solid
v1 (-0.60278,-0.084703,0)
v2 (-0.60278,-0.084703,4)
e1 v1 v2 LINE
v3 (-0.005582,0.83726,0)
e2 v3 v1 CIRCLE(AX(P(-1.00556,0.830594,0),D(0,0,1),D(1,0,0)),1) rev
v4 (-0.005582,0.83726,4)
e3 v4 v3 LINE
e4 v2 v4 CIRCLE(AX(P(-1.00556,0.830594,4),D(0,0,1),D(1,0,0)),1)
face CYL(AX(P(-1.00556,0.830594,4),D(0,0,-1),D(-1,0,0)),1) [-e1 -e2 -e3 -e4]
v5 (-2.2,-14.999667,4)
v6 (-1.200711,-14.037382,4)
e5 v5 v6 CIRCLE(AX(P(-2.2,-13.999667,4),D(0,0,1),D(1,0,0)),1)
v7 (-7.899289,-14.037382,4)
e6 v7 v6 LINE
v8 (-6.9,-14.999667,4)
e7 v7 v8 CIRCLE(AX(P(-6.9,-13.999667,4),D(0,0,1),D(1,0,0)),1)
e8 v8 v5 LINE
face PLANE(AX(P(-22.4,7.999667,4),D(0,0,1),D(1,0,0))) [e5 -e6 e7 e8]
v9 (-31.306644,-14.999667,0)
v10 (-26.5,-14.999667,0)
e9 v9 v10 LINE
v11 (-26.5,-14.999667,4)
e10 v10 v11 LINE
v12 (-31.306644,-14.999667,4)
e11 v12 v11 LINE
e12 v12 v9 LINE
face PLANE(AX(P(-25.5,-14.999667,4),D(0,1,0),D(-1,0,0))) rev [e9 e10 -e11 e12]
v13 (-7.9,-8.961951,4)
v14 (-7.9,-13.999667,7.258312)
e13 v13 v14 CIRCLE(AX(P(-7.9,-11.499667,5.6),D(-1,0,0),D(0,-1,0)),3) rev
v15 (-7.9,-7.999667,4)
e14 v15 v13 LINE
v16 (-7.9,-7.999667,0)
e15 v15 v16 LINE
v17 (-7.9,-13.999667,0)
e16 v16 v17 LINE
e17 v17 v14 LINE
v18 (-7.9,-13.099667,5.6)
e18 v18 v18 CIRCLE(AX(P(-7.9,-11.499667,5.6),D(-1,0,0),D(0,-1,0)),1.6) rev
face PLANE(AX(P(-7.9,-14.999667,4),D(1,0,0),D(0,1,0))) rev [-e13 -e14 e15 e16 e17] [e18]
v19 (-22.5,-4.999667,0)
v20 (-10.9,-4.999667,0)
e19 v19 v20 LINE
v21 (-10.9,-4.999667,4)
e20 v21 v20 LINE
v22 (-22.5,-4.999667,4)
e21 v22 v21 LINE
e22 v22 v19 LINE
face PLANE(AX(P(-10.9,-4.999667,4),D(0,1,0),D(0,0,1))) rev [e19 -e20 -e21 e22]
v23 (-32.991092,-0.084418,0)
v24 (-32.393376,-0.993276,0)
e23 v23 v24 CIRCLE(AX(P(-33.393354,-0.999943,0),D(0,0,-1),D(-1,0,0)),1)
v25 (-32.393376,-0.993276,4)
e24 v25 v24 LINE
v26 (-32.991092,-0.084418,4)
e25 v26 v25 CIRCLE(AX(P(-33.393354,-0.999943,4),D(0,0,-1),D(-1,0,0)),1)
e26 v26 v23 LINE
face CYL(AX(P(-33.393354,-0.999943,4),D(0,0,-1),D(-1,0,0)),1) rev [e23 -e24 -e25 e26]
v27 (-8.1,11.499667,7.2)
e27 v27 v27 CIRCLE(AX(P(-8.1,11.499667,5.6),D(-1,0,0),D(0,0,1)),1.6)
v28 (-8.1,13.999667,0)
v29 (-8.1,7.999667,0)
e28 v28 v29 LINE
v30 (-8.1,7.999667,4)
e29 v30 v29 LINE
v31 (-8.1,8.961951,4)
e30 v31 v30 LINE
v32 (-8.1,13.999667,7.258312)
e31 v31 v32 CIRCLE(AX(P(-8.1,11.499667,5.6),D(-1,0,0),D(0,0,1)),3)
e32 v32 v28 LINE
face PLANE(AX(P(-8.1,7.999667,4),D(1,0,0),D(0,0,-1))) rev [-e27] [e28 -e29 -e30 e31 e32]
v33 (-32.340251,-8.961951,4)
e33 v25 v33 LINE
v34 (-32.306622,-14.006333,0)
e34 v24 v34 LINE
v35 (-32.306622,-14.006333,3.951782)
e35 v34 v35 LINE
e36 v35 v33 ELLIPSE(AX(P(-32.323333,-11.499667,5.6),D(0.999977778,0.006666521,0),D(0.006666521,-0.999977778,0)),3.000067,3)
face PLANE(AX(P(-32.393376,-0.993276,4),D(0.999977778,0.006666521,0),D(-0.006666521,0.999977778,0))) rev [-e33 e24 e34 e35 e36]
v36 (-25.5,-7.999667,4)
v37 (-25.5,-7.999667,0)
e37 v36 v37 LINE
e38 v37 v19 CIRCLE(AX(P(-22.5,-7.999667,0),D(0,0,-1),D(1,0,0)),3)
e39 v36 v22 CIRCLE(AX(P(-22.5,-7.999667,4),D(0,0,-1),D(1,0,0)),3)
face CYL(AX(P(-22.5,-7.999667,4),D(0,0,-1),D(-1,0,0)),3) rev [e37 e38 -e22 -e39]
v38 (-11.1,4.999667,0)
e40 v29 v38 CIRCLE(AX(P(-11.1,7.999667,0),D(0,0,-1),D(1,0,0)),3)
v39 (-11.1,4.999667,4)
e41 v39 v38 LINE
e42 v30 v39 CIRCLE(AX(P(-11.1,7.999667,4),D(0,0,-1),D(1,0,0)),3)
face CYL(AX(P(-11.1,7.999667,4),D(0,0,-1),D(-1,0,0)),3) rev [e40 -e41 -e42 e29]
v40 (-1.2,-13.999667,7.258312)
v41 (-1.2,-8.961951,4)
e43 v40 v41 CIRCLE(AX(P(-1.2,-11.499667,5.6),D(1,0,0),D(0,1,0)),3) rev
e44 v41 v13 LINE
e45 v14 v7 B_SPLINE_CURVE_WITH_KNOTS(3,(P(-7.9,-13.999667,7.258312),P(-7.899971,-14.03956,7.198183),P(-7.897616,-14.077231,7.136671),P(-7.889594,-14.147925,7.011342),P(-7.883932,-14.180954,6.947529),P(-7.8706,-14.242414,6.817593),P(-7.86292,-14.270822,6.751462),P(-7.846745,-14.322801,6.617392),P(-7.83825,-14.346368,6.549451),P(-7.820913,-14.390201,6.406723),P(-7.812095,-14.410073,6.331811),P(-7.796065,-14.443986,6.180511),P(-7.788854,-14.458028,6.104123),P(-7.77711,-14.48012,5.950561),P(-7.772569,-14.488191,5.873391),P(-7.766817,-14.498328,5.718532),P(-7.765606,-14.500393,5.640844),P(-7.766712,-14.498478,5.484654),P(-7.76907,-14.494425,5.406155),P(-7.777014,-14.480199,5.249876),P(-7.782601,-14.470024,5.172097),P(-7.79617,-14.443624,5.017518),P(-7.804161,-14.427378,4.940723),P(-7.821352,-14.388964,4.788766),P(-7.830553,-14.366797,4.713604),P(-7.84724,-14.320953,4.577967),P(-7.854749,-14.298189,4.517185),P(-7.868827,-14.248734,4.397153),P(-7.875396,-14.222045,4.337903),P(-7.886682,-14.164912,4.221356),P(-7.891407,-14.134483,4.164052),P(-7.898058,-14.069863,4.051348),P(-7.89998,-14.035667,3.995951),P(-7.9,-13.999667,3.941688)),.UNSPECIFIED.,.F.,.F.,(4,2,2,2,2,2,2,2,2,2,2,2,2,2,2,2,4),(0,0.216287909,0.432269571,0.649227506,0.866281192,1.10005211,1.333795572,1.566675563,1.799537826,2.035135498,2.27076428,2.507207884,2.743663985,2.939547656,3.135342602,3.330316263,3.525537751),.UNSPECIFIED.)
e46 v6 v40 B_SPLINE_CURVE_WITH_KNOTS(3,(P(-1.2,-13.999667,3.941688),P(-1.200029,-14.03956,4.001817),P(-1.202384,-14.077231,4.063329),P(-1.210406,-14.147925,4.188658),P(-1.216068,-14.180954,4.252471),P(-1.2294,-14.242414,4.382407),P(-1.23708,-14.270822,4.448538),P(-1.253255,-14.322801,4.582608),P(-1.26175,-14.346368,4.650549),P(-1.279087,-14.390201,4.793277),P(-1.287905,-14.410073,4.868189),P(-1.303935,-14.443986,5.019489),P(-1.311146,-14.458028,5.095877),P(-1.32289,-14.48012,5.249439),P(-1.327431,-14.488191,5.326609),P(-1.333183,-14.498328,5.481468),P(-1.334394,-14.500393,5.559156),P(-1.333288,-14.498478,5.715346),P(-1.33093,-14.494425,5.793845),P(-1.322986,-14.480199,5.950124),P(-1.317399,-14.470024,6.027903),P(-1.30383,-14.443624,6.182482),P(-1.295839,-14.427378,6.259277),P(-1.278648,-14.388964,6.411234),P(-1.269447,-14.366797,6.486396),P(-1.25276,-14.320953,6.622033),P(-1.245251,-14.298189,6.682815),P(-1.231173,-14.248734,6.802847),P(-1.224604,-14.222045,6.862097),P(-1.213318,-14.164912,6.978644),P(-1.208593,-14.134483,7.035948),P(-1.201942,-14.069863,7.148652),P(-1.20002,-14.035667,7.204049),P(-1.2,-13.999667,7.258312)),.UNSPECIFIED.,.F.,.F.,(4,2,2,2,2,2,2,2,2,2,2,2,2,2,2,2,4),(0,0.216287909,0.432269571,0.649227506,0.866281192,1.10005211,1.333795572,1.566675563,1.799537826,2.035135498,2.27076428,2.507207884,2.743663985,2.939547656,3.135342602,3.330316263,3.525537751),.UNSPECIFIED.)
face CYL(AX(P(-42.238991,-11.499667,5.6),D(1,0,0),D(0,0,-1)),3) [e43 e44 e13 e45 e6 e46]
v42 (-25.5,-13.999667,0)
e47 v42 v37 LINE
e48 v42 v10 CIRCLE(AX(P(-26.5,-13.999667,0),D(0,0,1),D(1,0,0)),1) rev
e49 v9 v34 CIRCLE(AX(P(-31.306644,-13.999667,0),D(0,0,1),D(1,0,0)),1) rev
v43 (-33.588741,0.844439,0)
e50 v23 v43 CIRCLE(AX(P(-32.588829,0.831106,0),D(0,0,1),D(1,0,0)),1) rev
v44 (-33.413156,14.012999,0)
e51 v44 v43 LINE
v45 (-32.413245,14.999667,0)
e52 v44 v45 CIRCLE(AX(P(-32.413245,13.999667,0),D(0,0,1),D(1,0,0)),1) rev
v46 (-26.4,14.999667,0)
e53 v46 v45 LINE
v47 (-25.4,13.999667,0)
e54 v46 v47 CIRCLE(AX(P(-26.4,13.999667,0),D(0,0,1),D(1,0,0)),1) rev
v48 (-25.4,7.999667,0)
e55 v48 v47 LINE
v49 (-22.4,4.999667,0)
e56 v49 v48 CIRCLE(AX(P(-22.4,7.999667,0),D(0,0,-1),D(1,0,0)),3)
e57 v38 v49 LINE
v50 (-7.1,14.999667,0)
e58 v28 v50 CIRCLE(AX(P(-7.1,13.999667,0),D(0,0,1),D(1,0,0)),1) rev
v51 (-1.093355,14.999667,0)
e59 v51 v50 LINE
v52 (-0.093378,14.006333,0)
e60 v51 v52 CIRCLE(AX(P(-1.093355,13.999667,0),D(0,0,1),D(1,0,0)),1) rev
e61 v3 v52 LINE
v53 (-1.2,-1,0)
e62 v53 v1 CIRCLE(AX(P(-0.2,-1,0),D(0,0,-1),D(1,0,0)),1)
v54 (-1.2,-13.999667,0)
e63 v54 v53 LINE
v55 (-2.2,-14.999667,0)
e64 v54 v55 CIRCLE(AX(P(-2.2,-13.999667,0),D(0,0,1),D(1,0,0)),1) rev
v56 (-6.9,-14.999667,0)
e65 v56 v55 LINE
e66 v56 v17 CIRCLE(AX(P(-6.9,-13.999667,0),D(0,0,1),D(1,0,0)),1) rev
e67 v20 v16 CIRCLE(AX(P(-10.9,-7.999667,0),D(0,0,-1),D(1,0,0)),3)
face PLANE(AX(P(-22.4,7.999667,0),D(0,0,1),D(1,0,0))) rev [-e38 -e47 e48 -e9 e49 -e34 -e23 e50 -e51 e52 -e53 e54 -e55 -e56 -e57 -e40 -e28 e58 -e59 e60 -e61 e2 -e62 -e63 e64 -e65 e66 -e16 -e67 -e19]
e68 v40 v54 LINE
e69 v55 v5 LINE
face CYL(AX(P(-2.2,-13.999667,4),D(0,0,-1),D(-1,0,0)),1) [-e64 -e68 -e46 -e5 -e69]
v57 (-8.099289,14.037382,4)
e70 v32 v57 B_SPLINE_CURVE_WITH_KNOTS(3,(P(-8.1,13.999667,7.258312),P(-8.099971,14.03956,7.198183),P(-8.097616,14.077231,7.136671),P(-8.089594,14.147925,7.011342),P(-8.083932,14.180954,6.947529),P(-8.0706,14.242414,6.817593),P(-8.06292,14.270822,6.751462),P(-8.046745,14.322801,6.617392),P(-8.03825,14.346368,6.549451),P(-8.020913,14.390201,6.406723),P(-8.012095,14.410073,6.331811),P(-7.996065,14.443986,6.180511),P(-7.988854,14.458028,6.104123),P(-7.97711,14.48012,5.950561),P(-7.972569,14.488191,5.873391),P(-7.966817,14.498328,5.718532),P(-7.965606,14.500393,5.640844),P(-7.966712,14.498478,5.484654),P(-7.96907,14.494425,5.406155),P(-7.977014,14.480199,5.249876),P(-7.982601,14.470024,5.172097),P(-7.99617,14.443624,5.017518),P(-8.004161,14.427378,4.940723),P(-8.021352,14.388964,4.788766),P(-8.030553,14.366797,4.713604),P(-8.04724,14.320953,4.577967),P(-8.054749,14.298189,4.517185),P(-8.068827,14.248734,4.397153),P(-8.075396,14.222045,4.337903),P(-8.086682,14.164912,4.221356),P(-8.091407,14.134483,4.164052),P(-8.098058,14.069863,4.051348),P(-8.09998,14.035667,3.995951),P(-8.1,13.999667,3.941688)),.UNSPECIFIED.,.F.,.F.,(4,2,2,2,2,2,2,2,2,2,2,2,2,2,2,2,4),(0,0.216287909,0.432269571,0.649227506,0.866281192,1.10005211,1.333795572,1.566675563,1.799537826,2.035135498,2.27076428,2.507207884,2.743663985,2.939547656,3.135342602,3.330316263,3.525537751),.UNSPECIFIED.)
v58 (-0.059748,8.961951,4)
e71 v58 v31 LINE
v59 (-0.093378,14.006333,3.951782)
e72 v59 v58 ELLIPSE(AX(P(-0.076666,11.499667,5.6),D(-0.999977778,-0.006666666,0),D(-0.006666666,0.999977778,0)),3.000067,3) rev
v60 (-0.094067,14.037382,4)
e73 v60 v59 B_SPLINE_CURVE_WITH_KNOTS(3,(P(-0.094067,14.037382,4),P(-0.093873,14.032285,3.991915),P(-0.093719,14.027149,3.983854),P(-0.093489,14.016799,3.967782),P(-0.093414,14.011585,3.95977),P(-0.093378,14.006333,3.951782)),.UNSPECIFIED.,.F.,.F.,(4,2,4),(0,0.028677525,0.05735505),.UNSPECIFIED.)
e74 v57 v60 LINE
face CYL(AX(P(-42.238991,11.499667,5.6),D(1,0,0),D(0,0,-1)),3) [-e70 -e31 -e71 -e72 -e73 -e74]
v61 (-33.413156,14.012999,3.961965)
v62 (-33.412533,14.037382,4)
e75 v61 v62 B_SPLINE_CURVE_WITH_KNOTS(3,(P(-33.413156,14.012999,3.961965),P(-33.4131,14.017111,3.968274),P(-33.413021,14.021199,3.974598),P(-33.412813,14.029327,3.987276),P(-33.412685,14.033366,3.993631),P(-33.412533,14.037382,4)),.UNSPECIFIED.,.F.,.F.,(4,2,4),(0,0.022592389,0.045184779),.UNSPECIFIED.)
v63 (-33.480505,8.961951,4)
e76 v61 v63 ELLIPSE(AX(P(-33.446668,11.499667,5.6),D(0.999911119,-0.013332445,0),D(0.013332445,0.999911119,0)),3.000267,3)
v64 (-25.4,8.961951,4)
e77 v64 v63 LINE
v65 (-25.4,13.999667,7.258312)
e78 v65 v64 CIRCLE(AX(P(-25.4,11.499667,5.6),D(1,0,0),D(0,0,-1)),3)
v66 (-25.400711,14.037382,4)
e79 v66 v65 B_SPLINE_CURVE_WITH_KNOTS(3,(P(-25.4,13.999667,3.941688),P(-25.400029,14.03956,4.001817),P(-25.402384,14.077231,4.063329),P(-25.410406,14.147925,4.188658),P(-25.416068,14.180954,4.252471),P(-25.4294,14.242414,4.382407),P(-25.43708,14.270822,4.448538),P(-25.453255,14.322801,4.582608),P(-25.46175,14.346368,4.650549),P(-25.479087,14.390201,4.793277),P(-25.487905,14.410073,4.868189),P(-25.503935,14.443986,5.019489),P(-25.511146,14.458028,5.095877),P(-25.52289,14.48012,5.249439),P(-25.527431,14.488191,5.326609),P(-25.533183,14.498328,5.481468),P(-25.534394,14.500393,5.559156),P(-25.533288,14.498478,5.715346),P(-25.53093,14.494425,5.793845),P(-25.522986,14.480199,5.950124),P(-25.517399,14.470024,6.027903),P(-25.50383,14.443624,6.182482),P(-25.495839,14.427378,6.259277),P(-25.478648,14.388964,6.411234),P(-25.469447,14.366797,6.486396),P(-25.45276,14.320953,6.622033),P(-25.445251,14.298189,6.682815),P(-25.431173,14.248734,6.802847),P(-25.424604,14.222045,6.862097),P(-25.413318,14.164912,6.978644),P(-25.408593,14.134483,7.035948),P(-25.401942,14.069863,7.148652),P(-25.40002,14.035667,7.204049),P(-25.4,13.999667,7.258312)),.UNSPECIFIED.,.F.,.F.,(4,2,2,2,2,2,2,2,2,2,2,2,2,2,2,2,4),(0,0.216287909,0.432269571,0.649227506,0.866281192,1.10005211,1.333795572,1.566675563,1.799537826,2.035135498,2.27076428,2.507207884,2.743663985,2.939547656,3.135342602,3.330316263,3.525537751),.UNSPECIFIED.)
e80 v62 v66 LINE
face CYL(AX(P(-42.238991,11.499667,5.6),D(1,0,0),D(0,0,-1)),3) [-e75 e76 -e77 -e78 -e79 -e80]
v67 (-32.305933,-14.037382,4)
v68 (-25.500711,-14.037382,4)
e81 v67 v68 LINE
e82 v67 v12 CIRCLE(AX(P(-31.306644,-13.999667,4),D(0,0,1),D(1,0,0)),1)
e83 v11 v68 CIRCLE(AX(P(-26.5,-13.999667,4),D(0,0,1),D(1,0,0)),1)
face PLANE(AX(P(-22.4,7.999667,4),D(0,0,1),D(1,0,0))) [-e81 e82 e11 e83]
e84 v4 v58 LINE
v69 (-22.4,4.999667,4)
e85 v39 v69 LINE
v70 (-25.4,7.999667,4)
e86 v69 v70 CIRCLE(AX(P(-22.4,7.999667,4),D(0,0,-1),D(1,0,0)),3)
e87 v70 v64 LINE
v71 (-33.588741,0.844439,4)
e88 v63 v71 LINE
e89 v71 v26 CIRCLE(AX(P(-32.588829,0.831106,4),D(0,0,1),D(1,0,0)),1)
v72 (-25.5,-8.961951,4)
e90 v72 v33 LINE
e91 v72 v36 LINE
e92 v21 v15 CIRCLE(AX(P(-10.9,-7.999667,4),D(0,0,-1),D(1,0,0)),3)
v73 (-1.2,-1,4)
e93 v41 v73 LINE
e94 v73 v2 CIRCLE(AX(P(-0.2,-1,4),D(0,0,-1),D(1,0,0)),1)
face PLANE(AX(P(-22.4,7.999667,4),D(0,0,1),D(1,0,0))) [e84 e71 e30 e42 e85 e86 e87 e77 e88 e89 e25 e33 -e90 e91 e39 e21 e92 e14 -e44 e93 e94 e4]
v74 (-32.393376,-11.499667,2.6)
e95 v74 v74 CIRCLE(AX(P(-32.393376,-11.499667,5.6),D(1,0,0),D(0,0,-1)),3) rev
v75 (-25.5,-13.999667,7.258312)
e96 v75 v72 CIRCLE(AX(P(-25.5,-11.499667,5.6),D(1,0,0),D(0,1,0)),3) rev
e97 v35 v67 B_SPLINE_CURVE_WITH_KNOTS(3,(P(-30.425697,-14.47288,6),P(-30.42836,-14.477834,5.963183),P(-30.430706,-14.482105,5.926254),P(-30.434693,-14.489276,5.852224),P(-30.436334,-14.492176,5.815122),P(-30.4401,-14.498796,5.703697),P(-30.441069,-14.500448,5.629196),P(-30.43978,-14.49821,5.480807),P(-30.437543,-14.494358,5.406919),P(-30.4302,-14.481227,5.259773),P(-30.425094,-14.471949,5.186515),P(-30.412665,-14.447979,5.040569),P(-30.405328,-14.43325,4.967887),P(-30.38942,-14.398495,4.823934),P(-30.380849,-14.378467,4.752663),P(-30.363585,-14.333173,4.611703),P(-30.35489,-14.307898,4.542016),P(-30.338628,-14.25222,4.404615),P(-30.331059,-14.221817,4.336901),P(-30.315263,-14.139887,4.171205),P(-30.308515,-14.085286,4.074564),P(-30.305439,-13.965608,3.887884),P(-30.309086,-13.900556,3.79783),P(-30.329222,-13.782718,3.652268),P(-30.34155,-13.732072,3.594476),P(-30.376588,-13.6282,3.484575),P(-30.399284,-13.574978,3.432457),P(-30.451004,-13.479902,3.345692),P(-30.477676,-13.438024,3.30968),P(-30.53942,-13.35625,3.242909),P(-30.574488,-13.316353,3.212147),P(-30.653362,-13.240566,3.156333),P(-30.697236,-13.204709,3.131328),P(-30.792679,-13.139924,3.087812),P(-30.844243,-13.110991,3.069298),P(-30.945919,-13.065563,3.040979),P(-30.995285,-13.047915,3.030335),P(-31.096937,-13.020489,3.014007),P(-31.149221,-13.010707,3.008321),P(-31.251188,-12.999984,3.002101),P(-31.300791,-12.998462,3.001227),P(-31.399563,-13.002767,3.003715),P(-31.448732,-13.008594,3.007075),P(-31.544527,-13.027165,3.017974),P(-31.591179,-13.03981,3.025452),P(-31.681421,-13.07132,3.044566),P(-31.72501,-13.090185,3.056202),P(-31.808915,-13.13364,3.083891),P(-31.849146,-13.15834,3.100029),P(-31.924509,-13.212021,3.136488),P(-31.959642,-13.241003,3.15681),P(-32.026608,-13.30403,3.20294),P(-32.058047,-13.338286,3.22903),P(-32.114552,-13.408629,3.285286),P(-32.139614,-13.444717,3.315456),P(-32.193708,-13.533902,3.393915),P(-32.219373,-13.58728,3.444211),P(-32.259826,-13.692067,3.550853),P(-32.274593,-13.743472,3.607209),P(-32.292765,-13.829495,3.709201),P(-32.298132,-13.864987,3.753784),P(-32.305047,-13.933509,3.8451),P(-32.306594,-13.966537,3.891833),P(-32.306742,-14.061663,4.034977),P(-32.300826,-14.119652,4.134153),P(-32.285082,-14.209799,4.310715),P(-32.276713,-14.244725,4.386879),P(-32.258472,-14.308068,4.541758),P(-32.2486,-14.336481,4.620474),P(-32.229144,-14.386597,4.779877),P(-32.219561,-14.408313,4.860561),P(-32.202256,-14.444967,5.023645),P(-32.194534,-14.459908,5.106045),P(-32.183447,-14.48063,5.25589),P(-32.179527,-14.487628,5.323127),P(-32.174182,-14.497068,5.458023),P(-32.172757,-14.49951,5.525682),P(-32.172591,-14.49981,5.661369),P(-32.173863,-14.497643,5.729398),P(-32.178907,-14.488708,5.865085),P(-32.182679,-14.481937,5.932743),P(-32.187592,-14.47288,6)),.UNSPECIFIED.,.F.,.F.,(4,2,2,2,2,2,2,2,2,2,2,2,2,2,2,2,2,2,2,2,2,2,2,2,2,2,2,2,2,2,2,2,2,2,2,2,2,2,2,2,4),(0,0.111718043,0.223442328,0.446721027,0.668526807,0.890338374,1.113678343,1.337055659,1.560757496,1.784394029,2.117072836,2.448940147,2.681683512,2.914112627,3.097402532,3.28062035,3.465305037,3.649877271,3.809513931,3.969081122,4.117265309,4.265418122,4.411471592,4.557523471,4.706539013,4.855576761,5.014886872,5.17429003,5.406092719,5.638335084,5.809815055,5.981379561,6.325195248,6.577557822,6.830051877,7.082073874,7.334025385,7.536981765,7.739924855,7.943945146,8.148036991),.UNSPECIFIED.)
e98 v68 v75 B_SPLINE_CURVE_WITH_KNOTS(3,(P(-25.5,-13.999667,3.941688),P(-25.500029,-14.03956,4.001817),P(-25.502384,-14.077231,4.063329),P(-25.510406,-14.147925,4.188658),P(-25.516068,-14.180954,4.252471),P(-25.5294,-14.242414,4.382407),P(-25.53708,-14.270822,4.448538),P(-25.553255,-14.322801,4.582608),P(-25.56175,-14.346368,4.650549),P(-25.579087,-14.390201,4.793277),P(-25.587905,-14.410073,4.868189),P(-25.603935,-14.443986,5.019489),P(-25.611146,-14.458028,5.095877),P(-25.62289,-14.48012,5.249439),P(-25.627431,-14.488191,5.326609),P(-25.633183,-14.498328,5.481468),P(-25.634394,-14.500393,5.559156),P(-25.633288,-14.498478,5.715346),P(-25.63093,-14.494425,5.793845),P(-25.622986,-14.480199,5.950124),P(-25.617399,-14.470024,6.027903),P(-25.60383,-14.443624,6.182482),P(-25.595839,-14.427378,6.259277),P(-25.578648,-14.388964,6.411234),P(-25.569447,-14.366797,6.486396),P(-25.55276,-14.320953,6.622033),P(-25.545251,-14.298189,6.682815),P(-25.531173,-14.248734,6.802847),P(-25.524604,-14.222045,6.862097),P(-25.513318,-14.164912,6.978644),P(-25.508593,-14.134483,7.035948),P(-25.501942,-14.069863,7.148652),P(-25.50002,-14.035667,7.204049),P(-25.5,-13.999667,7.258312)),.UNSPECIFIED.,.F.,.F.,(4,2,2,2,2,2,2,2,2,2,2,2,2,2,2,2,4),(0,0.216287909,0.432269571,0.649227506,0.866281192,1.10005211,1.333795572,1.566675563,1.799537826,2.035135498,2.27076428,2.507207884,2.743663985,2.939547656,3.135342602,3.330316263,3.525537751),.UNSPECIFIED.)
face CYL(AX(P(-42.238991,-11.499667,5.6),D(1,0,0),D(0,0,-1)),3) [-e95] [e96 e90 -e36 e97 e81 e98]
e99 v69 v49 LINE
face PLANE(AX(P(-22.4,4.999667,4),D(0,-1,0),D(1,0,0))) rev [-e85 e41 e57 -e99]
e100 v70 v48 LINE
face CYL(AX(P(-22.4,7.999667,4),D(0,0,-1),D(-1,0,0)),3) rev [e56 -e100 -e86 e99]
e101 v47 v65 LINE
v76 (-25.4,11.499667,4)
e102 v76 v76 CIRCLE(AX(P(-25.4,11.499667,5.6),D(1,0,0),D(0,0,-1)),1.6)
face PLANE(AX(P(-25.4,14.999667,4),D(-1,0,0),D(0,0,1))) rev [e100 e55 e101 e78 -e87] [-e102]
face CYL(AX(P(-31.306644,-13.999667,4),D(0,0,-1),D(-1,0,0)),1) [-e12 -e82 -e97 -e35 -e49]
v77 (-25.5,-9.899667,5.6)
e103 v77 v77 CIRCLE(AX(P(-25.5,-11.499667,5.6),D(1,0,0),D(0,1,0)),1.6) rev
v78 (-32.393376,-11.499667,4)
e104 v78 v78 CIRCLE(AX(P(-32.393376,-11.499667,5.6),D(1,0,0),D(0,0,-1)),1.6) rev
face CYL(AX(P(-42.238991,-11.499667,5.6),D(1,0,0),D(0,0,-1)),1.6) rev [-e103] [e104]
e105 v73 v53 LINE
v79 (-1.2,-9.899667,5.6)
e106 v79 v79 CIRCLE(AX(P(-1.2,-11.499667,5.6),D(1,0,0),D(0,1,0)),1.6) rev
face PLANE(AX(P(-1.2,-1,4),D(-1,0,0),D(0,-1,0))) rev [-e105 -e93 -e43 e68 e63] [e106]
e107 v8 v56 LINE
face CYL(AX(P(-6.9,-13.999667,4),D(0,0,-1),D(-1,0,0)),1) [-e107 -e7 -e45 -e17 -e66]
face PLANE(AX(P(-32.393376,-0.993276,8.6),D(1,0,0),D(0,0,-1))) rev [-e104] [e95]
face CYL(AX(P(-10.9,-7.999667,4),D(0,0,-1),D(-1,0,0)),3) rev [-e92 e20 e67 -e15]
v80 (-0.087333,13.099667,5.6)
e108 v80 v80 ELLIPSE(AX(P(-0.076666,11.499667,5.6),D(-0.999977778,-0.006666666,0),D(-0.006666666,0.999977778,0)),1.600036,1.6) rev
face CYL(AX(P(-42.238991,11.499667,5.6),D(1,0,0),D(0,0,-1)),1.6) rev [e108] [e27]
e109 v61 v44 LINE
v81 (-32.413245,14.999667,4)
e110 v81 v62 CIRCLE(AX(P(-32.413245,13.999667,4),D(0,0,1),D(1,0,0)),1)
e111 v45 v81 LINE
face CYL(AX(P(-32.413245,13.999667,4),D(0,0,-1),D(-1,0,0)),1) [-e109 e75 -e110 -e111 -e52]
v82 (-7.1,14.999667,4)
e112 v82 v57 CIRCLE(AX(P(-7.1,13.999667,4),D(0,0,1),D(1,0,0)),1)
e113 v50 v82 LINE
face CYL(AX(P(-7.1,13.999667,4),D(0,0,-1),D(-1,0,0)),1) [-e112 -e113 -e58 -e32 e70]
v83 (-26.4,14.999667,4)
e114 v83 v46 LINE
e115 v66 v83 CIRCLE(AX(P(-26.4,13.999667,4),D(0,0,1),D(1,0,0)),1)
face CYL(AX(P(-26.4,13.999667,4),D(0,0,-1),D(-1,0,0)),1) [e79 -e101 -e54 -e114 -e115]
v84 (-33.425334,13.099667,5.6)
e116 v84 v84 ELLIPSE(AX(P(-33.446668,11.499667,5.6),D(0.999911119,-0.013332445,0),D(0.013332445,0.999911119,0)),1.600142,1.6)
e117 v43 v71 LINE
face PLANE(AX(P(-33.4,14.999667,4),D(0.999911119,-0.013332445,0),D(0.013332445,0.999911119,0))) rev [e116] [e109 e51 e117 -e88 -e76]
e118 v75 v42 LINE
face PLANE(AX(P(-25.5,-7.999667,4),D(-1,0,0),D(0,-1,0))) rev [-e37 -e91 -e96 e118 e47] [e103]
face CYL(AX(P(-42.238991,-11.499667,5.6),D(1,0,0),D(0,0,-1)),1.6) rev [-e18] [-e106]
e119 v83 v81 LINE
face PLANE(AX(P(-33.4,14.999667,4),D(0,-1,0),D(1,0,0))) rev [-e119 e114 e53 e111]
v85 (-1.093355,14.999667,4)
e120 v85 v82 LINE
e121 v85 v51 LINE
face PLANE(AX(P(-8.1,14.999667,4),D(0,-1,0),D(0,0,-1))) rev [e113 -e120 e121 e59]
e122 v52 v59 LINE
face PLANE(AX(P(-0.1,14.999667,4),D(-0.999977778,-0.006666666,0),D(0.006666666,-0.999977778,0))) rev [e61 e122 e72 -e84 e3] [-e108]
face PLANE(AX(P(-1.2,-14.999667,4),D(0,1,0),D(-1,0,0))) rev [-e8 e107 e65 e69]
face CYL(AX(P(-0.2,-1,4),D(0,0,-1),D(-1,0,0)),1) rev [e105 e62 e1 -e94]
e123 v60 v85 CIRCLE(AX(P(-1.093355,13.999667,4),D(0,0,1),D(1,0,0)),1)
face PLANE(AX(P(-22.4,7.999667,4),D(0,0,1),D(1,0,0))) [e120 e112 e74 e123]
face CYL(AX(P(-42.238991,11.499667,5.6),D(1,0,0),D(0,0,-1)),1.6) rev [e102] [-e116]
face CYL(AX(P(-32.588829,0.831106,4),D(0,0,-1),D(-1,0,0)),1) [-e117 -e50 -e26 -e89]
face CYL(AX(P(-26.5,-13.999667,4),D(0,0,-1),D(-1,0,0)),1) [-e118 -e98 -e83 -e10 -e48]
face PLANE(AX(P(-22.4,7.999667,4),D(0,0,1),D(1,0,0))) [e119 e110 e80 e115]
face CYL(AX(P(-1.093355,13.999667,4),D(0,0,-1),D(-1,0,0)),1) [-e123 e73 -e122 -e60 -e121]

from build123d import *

# Parameters (mm, degrees)
BOSS_EXTRUDE1_DEPTH             = 4
FILLET1_R                       = 1
BOSS_EXTRUDE3_REACH             = 25.017
SKETCH5_R                       = 3
SKETCH5_R_2                     = 1.6
BOSS_EXTRUDE3_DIRECTION_2_REACH = 25.017
CUT_EXTRUDE2_START              = -8.6000001
CUT_EXTRUDE2_DEPTH              = 6.0000001


# Read off the part's stored shape, not the designer's step: Cut-Extrude2
with BuildPart() as part:
    # Sketch1 → Boss-Extrude1 (new body)
    with BuildSketch(Plane.XY):
        with BuildLine():
            Line((-25.399999997, 14.999666663), (-25.399999997, 7.999666663))
            ThreePointArc((-25.399999997, 7.999666663), (-24.52132034, 5.878346319), (-22.399999997, 4.999666663))
            Line((-22.399999997, 4.999666663), (-11.099999997, 4.999666663))
            ThreePointArc((-11.099999997, 4.999666663), (-8.978679653, 5.878346319), (-8.099999997, 7.999666663))
            Line((-8.099999997, 7.999666663), (-8.099999997, 14.999666663))
            Line((-8.099999997, 14.999666663), (-0.099999997, 14.999666663))
            Line((-0.099999997, 14.999666663), (0, 0))
            Line((0, 0), (-0.2, 0))
            ThreePointArc((-0.2, 0), (-0.907106781, -0.292893219), (-1.2, -1))
            Line((-1.2, -1), (-1.2, -14.999666663))
            Line((-1.2, -14.999666663), (-7.900000003, -14.999666663))
            Line((-7.900000003, -14.999666663), (-7.900000003, -7.999666663))
            ThreePointArc((-7.900000003, -7.999666663), (-8.77867966, -5.878346319), (-10.900000003, -4.999666663))
            Line((-10.900000003, -4.999666663), (-22.500000003, -4.999666663))
            ThreePointArc((-22.500000003, -4.999666663), (-24.621320347, -5.878346319), (-25.500000003, -7.999666663))
            Line((-25.500000003, -7.999666663), (-25.500000003, -14.999666663))
            Line((-25.500000003, -14.999666663), (-32.300000003, -14.999666663))
            Line((-32.300000003, -14.999666663), (-32.39337598, -0.993276115))
            ThreePointArc((-32.39337598, -0.993276115), (-32.688706434, -0.290384923), (-33.39363154, 5.7325e-05))
            Line((-33.39363154, 5.7325e-05), (-33.6, 0))
            Line((-33.6, 0), (-33.399999997, 14.999666663))
            Line((-33.399999997, 14.999666663), (-25.399999997, 14.999666663))
        make_face()
    extrude(amount=BOSS_EXTRUDE1_DEPTH)

    # Fillet1
    fillet1_edges = [part.edges().sort_by_distance(p)[0] for p in [
        (-7.900000003, -14.999666663, 2),
        (-25.500000003, -14.999666663, 2),
        (-0.099999997, 14.999666663, 2),
        (-8.099999997, 14.999666663, 2),
        (-25.399999997, 14.999666663, 2),
        (-33.399999997, 14.999666663, 2),
        (-32.300000003, -14.999666663, 2),
        (-33.6, 0, 2),
        (-1.2, -14.999666663, 2),
        (0, 0, 2),
    ]]
    fillet(fillet1_edges, radius=FILLET1_R)

    # Boss-Extrude3: up to this plane
    boss_extrude3_end = Plane(origin=(-33.399999997, 14.999666663, 4), z_dir=(0.9999111190085467, -0.013332444752411323, 0))
    # Sketch5 → Boss-Extrude3 (add, up to the surface)
    with BuildSketch(Plane.ZY.offset(16.999999997), mode=Mode.PRIVATE) as boss_extrude3_sk1:
        with Locations(Location((5.6, 11.499666663, 0), (0, 0, 123.557309762))):
            Circle(SKETCH5_R)
        with Locations(Location((5.6, 11.499666663, 0), (0, 0, 90))):
            Circle(SKETCH5_R_2, mode=Mode.SUBTRACT)
    boss_extrude3_tool1 = split(extrude(boss_extrude3_sk1.sketch, amount=BOSS_EXTRUDE3_REACH, mode=Mode.PRIVATE), bisect_by=boss_extrude3_end, keep=Keep.BOTH, mode=Mode.PRIVATE)
    add(boss_extrude3_tool1.solids().sort_by_distance((-17, 9.070377, 7.211408))[0])
    # Sketch5 → Boss-Extrude3 (add, up to the surface)
    with BuildSketch(Plane.ZY.offset(16.999999997), mode=Mode.PRIVATE) as boss_extrude3_sk2:
        with Locations(Location((5.6, -11.499666663, 0), (0, 0, 90))):
            Circle(SKETCH5_R)
        with Locations(Location((5.6, -11.499666663, 0), (0, 0, 90))):
            Circle(SKETCH5_R_2, mode=Mode.SUBTRACT)
    boss_extrude3_tool2 = split(extrude(boss_extrude3_sk2.sketch, amount=BOSS_EXTRUDE3_REACH, mode=Mode.PRIVATE), bisect_by=boss_extrude3_end, keep=Keep.BOTH, mode=Mode.PRIVATE)
    add(boss_extrude3_tool2.solids().sort_by_distance((-17, -14.414814, 5.6))[0])

    # Boss-Extrude3 direction 2: up to this plane
    boss_extrude3_direction_2_end = Plane(origin=(-0.099999997, 14.999666663, 4), z_dir=(-0.9999777775323199, -0.006666666447507326, 0))
    # Sketch5 → Boss-Extrude3 direction 2 (add, up to the surface)
    with BuildSketch(Plane.ZY.offset(16.999999997), mode=Mode.PRIVATE) as boss_extrude3_direction_2_sk1:
        with Locations(Location((5.6, 11.499666663, 0), (0, 0, 123.557309762))):
            Circle(SKETCH5_R)
        with Locations(Location((5.6, 11.499666663, 0), (0, 0, 90))):
            Circle(SKETCH5_R_2, mode=Mode.SUBTRACT)
    boss_extrude3_direction_2_tool1 = split(extrude(boss_extrude3_direction_2_sk1.sketch, amount=-BOSS_EXTRUDE3_DIRECTION_2_REACH, mode=Mode.PRIVATE), bisect_by=boss_extrude3_direction_2_end, keep=Keep.BOTH, mode=Mode.PRIVATE)
    add(boss_extrude3_direction_2_tool1.solids().sort_by_distance((-17, 9.070377, 7.211408))[0])
    # Sketch5 → Boss-Extrude3 direction 2 (add, up to the surface)
    with BuildSketch(Plane.ZY.offset(16.999999997), mode=Mode.PRIVATE) as boss_extrude3_direction_2_sk2:
        with Locations(Location((5.6, -11.499666663, 0), (0, 0, 90))):
            Circle(SKETCH5_R)
        with Locations(Location((5.6, -11.499666663, 0), (0, 0, 90))):
            Circle(SKETCH5_R_2, mode=Mode.SUBTRACT)
    boss_extrude3_direction_2_tool2 = split(extrude(boss_extrude3_direction_2_sk2.sketch, amount=-BOSS_EXTRUDE3_DIRECTION_2_REACH, mode=Mode.PRIVATE), bisect_by=boss_extrude3_direction_2_end, keep=Keep.BOTH, mode=Mode.PRIVATE)
    add(boss_extrude3_direction_2_tool2.solids().sort_by_distance((-17, -14.414814, 5.6))[0])

    # Cut-Extrude2 outline → Cut-Extrude2 (cut)
    with BuildSketch(Plane(origin=(0, 0, 0), x_dir=(-1, 0, 0), z_dir=(0, 0, -1)).offset(CUT_EXTRUDE2_START)):
        Polygon((37.39337598, -0.993276115), (32.39337598, -0.993276115), (32.39337598, -8.499666663), (32.39337598, -14.499666663), (32.39337598, -14.999666663), (37.39337598, -14.999666663), align=None)
        with BuildLine():
            Line((26.399999997, 14.999666663), (7.099999997, 14.999666663))
            ThreePointArc((7.099999997, 14.999666663), (7.807106778, 14.706773444), (8.099999997, 13.999666663))
            Line((8.099999997, 13.999666663), (8.099999997, 7.999666663))
            ThreePointArc((8.099999997, 7.999666663), (8.978679653, 5.878346319), (11.099999997, 4.999666663))
            Line((11.099999997, 4.999666663), (22.399999997, 4.999666663))
            ThreePointArc((22.399999997, 4.999666663), (24.52132034, 5.878346319), (25.399999997, 7.999666663))
            Line((25.399999997, 7.999666663), (25.399999997, 13.999666663))
            ThreePointArc((25.399999997, 13.999666663), (25.692893216, 14.706773444), (26.399999997, 14.999666663))
        make_face()
        with BuildLine():
            Line((1.2, -13.999666663), (1.2, -1))
            Line((1.2, -1), (-2.8, -1))
            Line((-2.8, -1), (-2.8, -14.999666663))
            Line((-2.8, -14.999666663), (2.2, -14.999666663))
            ThreePointArc((2.2, -14.999666663), (1.492893219, -14.706773444), (1.2, -13.999666663))
        make_face()
        with BuildLine():
            ThreePointArc((7.900000003, -13.999666663), (7.607106784, -14.706773444), (6.900000003, -14.999666663))
            Line((6.900000003, -14.999666663), (26.500000003, -14.999666663))
            ThreePointArc((26.500000003, -14.999666663), (25.792893222, -14.706773444), (25.500000003, -13.999666663))
            Line((25.500000003, -13.999666663), (25.500000003, -7.999666663))
            ThreePointArc((25.500000003, -7.999666663), (24.621320347, -5.878346319), (22.500000003, -4.999666663))
            Line((22.500000003, -4.999666663), (10.900000003, -4.999666663))
            ThreePointArc((10.900000003, -4.999666663), (8.77867966, -5.878346319), (7.900000003, -7.999666663))
            Line((7.900000003, -7.999666663), (7.900000003, -13.999666663))
        make_face()
    extrude(amount=CUT_EXTRUDE2_DEPTH, mode=Mode.SUBTRACT)


solid = part.part
